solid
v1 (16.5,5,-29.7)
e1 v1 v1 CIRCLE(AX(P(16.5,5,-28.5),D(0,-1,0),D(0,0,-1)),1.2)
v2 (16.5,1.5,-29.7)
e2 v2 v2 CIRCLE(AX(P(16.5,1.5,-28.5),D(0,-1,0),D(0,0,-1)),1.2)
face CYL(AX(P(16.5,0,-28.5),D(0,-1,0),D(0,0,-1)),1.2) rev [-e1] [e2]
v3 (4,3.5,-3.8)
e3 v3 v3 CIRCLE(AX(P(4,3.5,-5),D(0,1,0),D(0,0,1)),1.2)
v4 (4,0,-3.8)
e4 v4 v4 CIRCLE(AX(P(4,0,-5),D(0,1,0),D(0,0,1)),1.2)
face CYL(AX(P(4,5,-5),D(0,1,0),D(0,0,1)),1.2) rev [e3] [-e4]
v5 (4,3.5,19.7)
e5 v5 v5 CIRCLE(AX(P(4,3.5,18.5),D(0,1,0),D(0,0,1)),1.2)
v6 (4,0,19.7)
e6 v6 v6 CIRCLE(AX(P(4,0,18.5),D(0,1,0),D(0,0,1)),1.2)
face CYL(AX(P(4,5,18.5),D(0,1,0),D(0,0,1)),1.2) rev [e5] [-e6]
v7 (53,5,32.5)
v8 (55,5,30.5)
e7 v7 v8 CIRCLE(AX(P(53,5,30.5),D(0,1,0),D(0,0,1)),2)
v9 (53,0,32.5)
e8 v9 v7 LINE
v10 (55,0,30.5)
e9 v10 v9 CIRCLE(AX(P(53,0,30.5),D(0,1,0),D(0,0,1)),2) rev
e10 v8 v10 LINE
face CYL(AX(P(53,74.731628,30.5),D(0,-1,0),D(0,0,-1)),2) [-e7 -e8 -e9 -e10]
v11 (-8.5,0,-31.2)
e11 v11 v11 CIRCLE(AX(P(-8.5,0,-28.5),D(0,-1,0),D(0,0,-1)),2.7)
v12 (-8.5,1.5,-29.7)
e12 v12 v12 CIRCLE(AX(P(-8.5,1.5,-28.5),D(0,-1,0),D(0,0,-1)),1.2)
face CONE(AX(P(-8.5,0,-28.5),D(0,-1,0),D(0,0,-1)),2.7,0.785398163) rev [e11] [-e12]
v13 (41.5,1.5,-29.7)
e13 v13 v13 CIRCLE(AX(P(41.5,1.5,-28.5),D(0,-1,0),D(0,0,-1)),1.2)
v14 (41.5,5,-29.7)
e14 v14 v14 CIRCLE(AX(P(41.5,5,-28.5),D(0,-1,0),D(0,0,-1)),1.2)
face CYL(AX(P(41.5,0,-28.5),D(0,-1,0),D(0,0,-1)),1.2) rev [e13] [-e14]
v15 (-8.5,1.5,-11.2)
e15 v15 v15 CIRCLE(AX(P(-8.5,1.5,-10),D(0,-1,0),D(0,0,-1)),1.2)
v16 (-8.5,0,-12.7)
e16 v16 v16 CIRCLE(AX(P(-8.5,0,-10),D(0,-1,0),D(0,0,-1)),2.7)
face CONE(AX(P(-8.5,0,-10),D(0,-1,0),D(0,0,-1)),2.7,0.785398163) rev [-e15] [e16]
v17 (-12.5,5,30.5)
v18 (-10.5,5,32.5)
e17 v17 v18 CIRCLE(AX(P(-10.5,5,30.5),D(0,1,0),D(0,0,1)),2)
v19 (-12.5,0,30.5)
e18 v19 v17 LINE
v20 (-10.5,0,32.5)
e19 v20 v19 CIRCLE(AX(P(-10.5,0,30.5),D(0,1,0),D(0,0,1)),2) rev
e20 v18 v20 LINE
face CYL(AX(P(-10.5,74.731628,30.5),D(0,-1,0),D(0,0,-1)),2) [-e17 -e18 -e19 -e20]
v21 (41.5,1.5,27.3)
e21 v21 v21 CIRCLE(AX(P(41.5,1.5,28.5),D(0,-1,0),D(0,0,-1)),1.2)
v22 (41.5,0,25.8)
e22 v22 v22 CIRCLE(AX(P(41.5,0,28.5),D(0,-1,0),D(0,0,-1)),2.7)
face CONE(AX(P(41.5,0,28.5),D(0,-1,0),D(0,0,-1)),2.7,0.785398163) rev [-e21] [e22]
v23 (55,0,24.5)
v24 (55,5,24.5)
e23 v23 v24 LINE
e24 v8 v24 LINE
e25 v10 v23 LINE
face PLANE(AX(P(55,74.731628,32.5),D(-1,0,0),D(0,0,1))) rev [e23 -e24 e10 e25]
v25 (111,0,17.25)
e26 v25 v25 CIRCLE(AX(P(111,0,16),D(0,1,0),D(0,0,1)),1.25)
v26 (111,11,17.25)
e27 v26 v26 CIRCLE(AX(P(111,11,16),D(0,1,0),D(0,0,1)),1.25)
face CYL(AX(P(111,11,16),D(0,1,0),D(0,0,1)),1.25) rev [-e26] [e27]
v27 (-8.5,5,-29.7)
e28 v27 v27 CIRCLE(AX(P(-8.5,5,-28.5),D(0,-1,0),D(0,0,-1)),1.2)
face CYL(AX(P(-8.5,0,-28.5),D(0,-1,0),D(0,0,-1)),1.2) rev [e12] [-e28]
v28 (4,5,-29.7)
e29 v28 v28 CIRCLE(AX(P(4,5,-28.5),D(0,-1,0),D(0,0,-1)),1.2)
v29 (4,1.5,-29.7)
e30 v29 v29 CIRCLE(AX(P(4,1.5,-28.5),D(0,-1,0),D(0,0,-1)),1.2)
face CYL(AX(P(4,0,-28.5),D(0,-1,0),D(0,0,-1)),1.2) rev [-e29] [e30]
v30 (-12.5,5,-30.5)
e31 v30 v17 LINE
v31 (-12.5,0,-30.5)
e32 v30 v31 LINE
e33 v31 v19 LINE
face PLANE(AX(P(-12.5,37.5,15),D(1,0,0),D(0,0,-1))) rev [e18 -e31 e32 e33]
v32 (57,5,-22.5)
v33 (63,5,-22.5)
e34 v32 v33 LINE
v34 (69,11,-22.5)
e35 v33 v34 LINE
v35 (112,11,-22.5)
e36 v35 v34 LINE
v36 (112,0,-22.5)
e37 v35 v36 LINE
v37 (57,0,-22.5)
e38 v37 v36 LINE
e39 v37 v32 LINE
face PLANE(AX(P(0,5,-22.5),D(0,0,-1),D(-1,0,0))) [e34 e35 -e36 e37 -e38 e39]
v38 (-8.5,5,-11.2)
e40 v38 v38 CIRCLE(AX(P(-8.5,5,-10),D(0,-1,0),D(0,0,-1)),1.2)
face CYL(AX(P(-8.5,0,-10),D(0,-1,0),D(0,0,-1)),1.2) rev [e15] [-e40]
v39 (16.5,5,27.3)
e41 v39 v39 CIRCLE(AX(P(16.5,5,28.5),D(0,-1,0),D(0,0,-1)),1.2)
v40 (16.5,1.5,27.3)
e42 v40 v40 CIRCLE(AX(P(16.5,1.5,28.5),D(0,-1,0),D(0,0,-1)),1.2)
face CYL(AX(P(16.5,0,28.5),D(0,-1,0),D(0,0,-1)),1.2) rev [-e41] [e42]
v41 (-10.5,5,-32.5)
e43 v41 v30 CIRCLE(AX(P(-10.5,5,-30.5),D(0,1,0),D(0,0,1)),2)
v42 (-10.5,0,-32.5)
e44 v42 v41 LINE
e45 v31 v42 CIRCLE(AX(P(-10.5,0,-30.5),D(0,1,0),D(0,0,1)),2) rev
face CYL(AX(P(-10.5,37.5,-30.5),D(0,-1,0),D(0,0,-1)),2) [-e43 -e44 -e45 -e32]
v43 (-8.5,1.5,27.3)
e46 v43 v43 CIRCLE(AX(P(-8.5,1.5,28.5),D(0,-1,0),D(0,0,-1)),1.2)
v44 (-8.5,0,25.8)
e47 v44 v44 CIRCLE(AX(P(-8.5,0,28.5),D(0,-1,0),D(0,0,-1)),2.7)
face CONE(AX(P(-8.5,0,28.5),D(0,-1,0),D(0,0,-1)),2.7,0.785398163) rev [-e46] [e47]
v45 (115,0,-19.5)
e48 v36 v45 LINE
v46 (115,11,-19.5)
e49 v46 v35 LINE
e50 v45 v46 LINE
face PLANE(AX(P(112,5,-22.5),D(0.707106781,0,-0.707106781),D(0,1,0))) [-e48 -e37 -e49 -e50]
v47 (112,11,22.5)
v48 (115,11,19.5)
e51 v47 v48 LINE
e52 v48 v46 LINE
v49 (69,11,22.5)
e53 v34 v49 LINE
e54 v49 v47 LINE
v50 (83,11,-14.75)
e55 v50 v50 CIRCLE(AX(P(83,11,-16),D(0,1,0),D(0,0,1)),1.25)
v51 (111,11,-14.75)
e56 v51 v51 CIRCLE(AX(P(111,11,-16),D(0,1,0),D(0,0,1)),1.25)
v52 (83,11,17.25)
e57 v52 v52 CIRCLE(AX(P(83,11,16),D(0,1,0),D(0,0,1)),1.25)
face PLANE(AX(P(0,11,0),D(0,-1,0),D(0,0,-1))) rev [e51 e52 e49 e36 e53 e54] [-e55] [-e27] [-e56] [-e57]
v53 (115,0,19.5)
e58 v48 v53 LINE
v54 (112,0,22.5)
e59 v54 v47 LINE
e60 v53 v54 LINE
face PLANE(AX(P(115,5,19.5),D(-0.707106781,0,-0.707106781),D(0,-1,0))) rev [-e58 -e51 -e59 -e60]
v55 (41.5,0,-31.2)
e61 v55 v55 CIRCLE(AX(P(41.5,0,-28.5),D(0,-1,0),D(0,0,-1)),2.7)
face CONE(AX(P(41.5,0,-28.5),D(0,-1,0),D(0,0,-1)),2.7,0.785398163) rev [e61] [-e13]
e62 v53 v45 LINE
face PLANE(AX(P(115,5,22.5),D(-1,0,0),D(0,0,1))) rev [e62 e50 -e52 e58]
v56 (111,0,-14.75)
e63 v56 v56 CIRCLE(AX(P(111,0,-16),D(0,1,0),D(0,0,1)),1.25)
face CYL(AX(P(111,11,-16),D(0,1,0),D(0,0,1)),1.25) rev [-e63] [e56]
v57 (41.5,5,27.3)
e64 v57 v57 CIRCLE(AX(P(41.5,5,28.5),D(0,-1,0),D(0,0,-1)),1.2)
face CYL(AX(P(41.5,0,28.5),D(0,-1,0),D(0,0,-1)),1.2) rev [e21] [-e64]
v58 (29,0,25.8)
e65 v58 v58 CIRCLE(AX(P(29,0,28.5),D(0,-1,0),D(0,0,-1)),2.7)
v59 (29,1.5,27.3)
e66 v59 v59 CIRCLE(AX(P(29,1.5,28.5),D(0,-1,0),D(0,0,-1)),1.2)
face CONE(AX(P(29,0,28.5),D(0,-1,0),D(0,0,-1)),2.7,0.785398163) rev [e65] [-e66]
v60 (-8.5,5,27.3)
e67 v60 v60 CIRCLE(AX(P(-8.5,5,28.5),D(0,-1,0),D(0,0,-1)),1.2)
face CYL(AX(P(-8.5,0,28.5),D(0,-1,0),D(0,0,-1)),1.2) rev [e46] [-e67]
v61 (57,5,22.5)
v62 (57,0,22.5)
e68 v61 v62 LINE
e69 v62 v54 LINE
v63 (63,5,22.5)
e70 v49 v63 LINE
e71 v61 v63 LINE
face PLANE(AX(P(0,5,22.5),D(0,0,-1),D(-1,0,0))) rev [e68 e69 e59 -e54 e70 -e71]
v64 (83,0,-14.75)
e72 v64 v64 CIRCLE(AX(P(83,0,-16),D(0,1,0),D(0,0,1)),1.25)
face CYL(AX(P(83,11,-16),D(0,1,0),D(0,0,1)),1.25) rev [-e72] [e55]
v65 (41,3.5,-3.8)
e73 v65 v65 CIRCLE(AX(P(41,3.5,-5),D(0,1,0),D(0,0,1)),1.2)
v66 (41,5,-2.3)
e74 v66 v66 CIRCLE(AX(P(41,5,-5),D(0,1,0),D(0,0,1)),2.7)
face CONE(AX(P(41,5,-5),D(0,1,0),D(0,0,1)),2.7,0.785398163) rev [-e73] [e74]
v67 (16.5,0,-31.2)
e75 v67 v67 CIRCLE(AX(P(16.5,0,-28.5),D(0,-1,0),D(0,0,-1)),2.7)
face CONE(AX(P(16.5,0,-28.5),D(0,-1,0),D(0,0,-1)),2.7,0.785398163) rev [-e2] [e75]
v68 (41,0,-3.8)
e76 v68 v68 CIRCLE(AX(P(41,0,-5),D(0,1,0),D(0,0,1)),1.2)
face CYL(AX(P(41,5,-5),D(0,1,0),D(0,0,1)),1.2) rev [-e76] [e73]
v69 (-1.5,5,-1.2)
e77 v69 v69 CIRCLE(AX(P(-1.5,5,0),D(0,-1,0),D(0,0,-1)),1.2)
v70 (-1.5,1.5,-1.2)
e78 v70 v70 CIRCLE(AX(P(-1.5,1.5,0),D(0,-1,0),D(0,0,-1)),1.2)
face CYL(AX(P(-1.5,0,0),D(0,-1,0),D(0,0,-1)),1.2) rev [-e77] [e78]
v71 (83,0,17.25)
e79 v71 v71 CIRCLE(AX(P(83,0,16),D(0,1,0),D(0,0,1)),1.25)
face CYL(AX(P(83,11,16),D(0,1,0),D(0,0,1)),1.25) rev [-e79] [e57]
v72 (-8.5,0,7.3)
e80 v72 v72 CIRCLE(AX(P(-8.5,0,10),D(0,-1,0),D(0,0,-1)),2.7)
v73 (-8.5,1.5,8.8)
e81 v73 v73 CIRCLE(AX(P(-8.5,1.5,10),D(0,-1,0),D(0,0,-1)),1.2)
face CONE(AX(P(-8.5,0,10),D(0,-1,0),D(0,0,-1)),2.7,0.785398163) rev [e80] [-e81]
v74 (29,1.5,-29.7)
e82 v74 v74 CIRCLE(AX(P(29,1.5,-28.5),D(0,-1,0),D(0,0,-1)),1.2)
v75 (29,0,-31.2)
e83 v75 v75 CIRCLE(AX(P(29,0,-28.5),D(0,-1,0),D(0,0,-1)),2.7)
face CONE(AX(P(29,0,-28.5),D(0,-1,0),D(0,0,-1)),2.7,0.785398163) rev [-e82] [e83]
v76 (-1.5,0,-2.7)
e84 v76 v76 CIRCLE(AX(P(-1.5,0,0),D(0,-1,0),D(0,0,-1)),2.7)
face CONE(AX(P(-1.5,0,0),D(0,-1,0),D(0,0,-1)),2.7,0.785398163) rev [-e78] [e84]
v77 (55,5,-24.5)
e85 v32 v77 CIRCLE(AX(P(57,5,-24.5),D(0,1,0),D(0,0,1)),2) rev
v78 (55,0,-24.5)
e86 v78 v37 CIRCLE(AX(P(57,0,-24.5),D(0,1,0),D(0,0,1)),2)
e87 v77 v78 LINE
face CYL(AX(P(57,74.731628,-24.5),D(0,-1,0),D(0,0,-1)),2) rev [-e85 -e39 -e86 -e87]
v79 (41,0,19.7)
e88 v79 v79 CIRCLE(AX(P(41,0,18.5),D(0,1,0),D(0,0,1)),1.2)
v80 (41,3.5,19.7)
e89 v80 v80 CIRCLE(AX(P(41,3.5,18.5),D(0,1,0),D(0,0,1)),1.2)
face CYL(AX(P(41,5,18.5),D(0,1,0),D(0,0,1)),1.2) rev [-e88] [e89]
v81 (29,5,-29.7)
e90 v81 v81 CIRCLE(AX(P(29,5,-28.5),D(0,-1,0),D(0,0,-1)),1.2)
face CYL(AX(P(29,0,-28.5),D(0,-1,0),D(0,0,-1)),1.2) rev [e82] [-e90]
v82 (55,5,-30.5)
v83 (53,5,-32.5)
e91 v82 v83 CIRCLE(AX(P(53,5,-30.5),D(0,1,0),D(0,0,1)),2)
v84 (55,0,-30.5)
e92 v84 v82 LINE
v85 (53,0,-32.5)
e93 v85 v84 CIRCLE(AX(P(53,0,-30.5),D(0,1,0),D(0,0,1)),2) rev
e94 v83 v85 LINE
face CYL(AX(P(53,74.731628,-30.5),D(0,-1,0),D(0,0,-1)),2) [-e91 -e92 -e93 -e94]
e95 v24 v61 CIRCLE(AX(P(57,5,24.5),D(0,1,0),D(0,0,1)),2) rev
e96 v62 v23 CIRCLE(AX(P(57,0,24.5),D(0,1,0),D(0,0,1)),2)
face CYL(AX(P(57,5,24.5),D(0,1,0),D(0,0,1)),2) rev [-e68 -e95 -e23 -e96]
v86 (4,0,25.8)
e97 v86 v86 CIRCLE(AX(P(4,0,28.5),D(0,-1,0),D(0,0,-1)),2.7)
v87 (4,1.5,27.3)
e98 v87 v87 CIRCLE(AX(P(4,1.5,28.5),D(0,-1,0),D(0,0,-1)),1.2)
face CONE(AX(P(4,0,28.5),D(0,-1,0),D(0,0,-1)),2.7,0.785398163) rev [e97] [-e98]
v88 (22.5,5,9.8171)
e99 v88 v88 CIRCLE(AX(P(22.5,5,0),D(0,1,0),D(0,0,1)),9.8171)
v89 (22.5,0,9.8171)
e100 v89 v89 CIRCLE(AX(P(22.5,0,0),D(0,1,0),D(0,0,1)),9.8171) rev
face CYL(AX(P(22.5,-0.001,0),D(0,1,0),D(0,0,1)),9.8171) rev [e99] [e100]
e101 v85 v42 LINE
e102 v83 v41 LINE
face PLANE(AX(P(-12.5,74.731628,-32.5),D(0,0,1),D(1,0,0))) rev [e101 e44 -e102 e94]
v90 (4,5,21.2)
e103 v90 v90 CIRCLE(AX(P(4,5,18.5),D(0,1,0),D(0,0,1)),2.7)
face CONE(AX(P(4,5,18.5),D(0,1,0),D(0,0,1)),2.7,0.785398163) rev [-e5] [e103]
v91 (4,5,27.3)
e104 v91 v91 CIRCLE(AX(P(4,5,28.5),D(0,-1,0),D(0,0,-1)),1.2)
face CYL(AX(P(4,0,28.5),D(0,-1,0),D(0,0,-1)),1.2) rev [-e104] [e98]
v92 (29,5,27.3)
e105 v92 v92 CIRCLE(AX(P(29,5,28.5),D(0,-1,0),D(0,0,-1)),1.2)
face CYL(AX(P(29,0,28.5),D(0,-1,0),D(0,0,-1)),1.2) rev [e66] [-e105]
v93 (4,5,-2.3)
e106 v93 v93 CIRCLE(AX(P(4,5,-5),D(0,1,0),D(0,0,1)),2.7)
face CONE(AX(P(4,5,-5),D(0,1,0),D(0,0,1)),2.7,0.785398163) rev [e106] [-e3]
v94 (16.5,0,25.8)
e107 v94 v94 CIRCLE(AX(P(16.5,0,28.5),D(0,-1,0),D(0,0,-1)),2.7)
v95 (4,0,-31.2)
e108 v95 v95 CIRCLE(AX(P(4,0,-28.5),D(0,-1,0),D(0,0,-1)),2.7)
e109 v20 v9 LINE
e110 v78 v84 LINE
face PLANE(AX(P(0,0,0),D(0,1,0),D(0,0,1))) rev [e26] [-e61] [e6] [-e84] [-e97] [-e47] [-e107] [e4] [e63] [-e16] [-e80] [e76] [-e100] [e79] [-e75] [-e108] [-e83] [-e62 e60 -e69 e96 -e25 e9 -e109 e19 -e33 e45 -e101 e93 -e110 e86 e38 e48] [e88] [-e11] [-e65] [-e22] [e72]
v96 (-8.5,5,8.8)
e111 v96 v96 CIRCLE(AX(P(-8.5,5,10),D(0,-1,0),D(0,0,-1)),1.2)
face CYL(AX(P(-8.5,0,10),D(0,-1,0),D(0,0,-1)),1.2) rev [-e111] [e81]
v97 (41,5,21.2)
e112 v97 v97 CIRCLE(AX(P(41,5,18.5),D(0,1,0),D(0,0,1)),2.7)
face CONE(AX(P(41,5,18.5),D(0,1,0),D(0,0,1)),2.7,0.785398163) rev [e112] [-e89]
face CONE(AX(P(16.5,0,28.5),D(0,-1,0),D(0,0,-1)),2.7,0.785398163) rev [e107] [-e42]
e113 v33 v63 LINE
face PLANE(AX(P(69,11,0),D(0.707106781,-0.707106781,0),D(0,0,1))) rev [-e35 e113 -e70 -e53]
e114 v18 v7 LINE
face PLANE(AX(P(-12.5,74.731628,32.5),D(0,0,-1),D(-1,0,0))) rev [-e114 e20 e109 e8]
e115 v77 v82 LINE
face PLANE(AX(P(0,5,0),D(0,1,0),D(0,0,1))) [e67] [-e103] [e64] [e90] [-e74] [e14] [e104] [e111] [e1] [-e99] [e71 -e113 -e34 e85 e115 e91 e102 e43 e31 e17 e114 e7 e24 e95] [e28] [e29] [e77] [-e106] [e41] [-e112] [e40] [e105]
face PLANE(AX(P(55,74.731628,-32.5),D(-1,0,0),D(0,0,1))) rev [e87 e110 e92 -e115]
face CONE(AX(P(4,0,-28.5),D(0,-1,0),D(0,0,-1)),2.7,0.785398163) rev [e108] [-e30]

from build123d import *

# Parameters (mm, degrees)
SKETCH1_W                                           = 115
SKETCH1_H                                           = 45
BOSS_EXTRUDE1_DEPTH                                 = 5
CUT_EXTRUDE1_REACH                                  = 119.287
SKETCH2_R                                           = 9.8171
CSK_FOR_M2_COUNTERSUNK_FLAT_HEAD_SCREW1_D           = 2.4
CSK_FOR_M2_COUNTERSUNK_FLAT_HEAD_SCREW1_CSINK_D     = 5.4
CSK_FOR_M2_COUNTERSUNK_FLAT_HEAD_SCREW1_CSINK_ANGLE = 90
SKETCH13_W                                          = 52
SKETCH13_H                                          = 45
BOSS_EXTRUDE4_DEPTH                                 = 6
CHAMFER2_SIZE                                       = 6
M3_TAPPED_HOLE1_D                                   = 2.5
CHAMFER1_SIZE                                       = 3
SKETCH14_W                                          = 12.5
SKETCH14_H                                          = 30
BOSS_EXTRUDE5_DEPTH                                 = 5
BOSS_EXTRUDE6_DEPTH                                 = 5
FILLET1_R                                           = 2
CSK_FOR_M2_COUNTERSUNK_FLAT_HEAD_SCREW2_D           = 2.4
CSK_FOR_M2_COUNTERSUNK_FLAT_HEAD_SCREW2_DEPTH       = 5
CSK_FOR_M2_COUNTERSUNK_FLAT_HEAD_SCREW2_CSINK_D     = 5.4
CSK_FOR_M2_COUNTERSUNK_FLAT_HEAD_SCREW2_CSINK_ANGLE = 90
CSK_FOR_M2_COUNTERSUNK_FLAT_HEAD_SCREW2_TIP         = 0.721032743


with BuildPart() as part:
    # Sketch1 → Boss-Extrude1 (new body)
    with BuildSketch(Plane(origin=(0, 0, 0), x_dir=(1, 0, 0), z_dir=(0, 1, 0))):
        with Locations((57.5, 0)):
            Rectangle(SKETCH1_W, SKETCH1_H)
    extrude(amount=BOSS_EXTRUDE1_DEPTH)

    # Sketch2 → Cut-Extrude1 (cut, up to next)
    with BuildSketch(Plane(origin=(0, 5, 0), x_dir=(1, 0, 0), z_dir=(0, 1, 0)), mode=Mode.PRIVATE) as cut_extrude1_sk1:
        with Locations(Location((22.5, 0, 0), (0, 0, 270))):
            Circle(SKETCH2_R)
    cut_extrude1_tool1 = extrude(cut_extrude1_sk1.sketch, amount=-CUT_EXTRUDE1_REACH, mode=Mode.PRIVATE) & part.part
    add(cut_extrude1_tool1.solids().sort_by_distance((22.5, 5, 0))[0], mode=Mode.SUBTRACT)

    # CSK for M2 Countersunk Flat Head Screw1 (through all)
    with Locations(Plane(origin=(0, 5, 0), x_dir=(1, 0, 0), z_dir=(0, 1, 0))):
        with Locations((4, -18.5), (41, -18.5), (41, 5), (4, 5)):
            CounterSinkHole(CSK_FOR_M2_COUNTERSUNK_FLAT_HEAD_SCREW1_D / 2, CSK_FOR_M2_COUNTERSUNK_FLAT_HEAD_SCREW1_CSINK_D / 2, counter_sink_angle=CSK_FOR_M2_COUNTERSUNK_FLAT_HEAD_SCREW1_CSINK_ANGLE)

    # Sketch13 → Boss-Extrude4 (add)
    with BuildSketch(Plane(origin=(0, 5, 0), x_dir=(1, 0, 0), z_dir=(0, 1, 0))):
        with Locations((89, 0)):
            Rectangle(SKETCH13_W, SKETCH13_H)
    extrude(amount=BOSS_EXTRUDE4_DEPTH)

    # Chamfer2
    chamfer2_edges = [part.edges().sort_by_distance(p)[0] for p in [
        (63, 11, 0),
    ]]
    chamfer(chamfer2_edges, length=CHAMFER2_SIZE - 0.0001)  # a hair under: the kernel refuses the full size

    # M3 Tapped Hole1 (through all)
    with Locations(Plane(origin=(0, 11, 0), x_dir=(1, 0, 0), z_dir=(0, 1, 0))):
        with Locations((83, 16), (111, 16), (83, -16), (111, -16)):
            Hole(M3_TAPPED_HOLE1_D / 2)

    # Chamfer1
    chamfer1_edges = [part.edges().sort_by_distance(p)[0] for p in [
        (115, 5.5, -22.5),
        (115, 5.5, 22.5),
    ]]
    chamfer(chamfer1_edges, length=CHAMFER1_SIZE)

    # Sketch14 → Boss-Extrude5 (add)
    with BuildSketch(Plane(origin=(0, 0, 0), x_dir=(1, 0, 0), z_dir=(0, 1, 0))):
        with Locations((-6.25, 0)):
            Rectangle(SKETCH14_W, SKETCH14_H)
    extrude(amount=BOSS_EXTRUDE5_DEPTH)

    # Sketch17 → Boss-Extrude6 (add)
    with BuildSketch(Plane(origin=(0, 0, 0), x_dir=(1, 0, 0), z_dir=(0, 1, 0))):
        Polygon((-12.5, 15), (-12.5, 32.5), (55, 32.5), (55, 22.5), (0, 22.5), (0, 15), align=None)
        Polygon((-12.5, -15), (-12.5, -32.5), (55, -32.5), (55, -22.5), (0, -22.5), (0, -15), align=None)
    extrude(amount=BOSS_EXTRUDE6_DEPTH)

    # Fillet1
    fillet1_edges = [part.edges().sort_by_distance(p)[0] for p in [
        (55, 2.5, -22.5),
        (55, 2.5, -32.5),
        (-12.5, 2.5, -32.5),
        (-12.5, 2.5, 32.5),
        (55, 2.5, 32.5),
        (55, 2.5, 22.5),
    ]]
    fillet(fillet1_edges, radius=FILLET1_R)

    # CSK for M2 Countersunk Flat Head Screw2
    with Locations(Plane(origin=(0, 0, 0), x_dir=(-1, 0, 0), z_dir=(0, -1, 0))):
        with Locations((1.5, 0), (8.5, -10), (8.5, 10), (8.5, -28.5), (-4, -28.5), (-16.5, -28.5), (-41.5, -28.5), (-41.5, 28.5), (-29, 28.5), (-16.5, 28.5), (-4, 28.5), (8.5, 28.5), (-29, -28.5)):
            CounterSinkHole(CSK_FOR_M2_COUNTERSUNK_FLAT_HEAD_SCREW2_D / 2, CSK_FOR_M2_COUNTERSUNK_FLAT_HEAD_SCREW2_CSINK_D / 2, depth=CSK_FOR_M2_COUNTERSUNK_FLAT_HEAD_SCREW2_DEPTH, counter_sink_angle=CSK_FOR_M2_COUNTERSUNK_FLAT_HEAD_SCREW2_CSINK_ANGLE)
            with Locations((0, 0, -(CSK_FOR_M2_COUNTERSUNK_FLAT_HEAD_SCREW2_DEPTH + CSK_FOR_M2_COUNTERSUNK_FLAT_HEAD_SCREW2_TIP / 2))):  # 118° drill point
                Cone(0, CSK_FOR_M2_COUNTERSUNK_FLAT_HEAD_SCREW2_D / 2, CSK_FOR_M2_COUNTERSUNK_FLAT_HEAD_SCREW2_TIP, mode=Mode.SUBTRACT)


solid = part.part
